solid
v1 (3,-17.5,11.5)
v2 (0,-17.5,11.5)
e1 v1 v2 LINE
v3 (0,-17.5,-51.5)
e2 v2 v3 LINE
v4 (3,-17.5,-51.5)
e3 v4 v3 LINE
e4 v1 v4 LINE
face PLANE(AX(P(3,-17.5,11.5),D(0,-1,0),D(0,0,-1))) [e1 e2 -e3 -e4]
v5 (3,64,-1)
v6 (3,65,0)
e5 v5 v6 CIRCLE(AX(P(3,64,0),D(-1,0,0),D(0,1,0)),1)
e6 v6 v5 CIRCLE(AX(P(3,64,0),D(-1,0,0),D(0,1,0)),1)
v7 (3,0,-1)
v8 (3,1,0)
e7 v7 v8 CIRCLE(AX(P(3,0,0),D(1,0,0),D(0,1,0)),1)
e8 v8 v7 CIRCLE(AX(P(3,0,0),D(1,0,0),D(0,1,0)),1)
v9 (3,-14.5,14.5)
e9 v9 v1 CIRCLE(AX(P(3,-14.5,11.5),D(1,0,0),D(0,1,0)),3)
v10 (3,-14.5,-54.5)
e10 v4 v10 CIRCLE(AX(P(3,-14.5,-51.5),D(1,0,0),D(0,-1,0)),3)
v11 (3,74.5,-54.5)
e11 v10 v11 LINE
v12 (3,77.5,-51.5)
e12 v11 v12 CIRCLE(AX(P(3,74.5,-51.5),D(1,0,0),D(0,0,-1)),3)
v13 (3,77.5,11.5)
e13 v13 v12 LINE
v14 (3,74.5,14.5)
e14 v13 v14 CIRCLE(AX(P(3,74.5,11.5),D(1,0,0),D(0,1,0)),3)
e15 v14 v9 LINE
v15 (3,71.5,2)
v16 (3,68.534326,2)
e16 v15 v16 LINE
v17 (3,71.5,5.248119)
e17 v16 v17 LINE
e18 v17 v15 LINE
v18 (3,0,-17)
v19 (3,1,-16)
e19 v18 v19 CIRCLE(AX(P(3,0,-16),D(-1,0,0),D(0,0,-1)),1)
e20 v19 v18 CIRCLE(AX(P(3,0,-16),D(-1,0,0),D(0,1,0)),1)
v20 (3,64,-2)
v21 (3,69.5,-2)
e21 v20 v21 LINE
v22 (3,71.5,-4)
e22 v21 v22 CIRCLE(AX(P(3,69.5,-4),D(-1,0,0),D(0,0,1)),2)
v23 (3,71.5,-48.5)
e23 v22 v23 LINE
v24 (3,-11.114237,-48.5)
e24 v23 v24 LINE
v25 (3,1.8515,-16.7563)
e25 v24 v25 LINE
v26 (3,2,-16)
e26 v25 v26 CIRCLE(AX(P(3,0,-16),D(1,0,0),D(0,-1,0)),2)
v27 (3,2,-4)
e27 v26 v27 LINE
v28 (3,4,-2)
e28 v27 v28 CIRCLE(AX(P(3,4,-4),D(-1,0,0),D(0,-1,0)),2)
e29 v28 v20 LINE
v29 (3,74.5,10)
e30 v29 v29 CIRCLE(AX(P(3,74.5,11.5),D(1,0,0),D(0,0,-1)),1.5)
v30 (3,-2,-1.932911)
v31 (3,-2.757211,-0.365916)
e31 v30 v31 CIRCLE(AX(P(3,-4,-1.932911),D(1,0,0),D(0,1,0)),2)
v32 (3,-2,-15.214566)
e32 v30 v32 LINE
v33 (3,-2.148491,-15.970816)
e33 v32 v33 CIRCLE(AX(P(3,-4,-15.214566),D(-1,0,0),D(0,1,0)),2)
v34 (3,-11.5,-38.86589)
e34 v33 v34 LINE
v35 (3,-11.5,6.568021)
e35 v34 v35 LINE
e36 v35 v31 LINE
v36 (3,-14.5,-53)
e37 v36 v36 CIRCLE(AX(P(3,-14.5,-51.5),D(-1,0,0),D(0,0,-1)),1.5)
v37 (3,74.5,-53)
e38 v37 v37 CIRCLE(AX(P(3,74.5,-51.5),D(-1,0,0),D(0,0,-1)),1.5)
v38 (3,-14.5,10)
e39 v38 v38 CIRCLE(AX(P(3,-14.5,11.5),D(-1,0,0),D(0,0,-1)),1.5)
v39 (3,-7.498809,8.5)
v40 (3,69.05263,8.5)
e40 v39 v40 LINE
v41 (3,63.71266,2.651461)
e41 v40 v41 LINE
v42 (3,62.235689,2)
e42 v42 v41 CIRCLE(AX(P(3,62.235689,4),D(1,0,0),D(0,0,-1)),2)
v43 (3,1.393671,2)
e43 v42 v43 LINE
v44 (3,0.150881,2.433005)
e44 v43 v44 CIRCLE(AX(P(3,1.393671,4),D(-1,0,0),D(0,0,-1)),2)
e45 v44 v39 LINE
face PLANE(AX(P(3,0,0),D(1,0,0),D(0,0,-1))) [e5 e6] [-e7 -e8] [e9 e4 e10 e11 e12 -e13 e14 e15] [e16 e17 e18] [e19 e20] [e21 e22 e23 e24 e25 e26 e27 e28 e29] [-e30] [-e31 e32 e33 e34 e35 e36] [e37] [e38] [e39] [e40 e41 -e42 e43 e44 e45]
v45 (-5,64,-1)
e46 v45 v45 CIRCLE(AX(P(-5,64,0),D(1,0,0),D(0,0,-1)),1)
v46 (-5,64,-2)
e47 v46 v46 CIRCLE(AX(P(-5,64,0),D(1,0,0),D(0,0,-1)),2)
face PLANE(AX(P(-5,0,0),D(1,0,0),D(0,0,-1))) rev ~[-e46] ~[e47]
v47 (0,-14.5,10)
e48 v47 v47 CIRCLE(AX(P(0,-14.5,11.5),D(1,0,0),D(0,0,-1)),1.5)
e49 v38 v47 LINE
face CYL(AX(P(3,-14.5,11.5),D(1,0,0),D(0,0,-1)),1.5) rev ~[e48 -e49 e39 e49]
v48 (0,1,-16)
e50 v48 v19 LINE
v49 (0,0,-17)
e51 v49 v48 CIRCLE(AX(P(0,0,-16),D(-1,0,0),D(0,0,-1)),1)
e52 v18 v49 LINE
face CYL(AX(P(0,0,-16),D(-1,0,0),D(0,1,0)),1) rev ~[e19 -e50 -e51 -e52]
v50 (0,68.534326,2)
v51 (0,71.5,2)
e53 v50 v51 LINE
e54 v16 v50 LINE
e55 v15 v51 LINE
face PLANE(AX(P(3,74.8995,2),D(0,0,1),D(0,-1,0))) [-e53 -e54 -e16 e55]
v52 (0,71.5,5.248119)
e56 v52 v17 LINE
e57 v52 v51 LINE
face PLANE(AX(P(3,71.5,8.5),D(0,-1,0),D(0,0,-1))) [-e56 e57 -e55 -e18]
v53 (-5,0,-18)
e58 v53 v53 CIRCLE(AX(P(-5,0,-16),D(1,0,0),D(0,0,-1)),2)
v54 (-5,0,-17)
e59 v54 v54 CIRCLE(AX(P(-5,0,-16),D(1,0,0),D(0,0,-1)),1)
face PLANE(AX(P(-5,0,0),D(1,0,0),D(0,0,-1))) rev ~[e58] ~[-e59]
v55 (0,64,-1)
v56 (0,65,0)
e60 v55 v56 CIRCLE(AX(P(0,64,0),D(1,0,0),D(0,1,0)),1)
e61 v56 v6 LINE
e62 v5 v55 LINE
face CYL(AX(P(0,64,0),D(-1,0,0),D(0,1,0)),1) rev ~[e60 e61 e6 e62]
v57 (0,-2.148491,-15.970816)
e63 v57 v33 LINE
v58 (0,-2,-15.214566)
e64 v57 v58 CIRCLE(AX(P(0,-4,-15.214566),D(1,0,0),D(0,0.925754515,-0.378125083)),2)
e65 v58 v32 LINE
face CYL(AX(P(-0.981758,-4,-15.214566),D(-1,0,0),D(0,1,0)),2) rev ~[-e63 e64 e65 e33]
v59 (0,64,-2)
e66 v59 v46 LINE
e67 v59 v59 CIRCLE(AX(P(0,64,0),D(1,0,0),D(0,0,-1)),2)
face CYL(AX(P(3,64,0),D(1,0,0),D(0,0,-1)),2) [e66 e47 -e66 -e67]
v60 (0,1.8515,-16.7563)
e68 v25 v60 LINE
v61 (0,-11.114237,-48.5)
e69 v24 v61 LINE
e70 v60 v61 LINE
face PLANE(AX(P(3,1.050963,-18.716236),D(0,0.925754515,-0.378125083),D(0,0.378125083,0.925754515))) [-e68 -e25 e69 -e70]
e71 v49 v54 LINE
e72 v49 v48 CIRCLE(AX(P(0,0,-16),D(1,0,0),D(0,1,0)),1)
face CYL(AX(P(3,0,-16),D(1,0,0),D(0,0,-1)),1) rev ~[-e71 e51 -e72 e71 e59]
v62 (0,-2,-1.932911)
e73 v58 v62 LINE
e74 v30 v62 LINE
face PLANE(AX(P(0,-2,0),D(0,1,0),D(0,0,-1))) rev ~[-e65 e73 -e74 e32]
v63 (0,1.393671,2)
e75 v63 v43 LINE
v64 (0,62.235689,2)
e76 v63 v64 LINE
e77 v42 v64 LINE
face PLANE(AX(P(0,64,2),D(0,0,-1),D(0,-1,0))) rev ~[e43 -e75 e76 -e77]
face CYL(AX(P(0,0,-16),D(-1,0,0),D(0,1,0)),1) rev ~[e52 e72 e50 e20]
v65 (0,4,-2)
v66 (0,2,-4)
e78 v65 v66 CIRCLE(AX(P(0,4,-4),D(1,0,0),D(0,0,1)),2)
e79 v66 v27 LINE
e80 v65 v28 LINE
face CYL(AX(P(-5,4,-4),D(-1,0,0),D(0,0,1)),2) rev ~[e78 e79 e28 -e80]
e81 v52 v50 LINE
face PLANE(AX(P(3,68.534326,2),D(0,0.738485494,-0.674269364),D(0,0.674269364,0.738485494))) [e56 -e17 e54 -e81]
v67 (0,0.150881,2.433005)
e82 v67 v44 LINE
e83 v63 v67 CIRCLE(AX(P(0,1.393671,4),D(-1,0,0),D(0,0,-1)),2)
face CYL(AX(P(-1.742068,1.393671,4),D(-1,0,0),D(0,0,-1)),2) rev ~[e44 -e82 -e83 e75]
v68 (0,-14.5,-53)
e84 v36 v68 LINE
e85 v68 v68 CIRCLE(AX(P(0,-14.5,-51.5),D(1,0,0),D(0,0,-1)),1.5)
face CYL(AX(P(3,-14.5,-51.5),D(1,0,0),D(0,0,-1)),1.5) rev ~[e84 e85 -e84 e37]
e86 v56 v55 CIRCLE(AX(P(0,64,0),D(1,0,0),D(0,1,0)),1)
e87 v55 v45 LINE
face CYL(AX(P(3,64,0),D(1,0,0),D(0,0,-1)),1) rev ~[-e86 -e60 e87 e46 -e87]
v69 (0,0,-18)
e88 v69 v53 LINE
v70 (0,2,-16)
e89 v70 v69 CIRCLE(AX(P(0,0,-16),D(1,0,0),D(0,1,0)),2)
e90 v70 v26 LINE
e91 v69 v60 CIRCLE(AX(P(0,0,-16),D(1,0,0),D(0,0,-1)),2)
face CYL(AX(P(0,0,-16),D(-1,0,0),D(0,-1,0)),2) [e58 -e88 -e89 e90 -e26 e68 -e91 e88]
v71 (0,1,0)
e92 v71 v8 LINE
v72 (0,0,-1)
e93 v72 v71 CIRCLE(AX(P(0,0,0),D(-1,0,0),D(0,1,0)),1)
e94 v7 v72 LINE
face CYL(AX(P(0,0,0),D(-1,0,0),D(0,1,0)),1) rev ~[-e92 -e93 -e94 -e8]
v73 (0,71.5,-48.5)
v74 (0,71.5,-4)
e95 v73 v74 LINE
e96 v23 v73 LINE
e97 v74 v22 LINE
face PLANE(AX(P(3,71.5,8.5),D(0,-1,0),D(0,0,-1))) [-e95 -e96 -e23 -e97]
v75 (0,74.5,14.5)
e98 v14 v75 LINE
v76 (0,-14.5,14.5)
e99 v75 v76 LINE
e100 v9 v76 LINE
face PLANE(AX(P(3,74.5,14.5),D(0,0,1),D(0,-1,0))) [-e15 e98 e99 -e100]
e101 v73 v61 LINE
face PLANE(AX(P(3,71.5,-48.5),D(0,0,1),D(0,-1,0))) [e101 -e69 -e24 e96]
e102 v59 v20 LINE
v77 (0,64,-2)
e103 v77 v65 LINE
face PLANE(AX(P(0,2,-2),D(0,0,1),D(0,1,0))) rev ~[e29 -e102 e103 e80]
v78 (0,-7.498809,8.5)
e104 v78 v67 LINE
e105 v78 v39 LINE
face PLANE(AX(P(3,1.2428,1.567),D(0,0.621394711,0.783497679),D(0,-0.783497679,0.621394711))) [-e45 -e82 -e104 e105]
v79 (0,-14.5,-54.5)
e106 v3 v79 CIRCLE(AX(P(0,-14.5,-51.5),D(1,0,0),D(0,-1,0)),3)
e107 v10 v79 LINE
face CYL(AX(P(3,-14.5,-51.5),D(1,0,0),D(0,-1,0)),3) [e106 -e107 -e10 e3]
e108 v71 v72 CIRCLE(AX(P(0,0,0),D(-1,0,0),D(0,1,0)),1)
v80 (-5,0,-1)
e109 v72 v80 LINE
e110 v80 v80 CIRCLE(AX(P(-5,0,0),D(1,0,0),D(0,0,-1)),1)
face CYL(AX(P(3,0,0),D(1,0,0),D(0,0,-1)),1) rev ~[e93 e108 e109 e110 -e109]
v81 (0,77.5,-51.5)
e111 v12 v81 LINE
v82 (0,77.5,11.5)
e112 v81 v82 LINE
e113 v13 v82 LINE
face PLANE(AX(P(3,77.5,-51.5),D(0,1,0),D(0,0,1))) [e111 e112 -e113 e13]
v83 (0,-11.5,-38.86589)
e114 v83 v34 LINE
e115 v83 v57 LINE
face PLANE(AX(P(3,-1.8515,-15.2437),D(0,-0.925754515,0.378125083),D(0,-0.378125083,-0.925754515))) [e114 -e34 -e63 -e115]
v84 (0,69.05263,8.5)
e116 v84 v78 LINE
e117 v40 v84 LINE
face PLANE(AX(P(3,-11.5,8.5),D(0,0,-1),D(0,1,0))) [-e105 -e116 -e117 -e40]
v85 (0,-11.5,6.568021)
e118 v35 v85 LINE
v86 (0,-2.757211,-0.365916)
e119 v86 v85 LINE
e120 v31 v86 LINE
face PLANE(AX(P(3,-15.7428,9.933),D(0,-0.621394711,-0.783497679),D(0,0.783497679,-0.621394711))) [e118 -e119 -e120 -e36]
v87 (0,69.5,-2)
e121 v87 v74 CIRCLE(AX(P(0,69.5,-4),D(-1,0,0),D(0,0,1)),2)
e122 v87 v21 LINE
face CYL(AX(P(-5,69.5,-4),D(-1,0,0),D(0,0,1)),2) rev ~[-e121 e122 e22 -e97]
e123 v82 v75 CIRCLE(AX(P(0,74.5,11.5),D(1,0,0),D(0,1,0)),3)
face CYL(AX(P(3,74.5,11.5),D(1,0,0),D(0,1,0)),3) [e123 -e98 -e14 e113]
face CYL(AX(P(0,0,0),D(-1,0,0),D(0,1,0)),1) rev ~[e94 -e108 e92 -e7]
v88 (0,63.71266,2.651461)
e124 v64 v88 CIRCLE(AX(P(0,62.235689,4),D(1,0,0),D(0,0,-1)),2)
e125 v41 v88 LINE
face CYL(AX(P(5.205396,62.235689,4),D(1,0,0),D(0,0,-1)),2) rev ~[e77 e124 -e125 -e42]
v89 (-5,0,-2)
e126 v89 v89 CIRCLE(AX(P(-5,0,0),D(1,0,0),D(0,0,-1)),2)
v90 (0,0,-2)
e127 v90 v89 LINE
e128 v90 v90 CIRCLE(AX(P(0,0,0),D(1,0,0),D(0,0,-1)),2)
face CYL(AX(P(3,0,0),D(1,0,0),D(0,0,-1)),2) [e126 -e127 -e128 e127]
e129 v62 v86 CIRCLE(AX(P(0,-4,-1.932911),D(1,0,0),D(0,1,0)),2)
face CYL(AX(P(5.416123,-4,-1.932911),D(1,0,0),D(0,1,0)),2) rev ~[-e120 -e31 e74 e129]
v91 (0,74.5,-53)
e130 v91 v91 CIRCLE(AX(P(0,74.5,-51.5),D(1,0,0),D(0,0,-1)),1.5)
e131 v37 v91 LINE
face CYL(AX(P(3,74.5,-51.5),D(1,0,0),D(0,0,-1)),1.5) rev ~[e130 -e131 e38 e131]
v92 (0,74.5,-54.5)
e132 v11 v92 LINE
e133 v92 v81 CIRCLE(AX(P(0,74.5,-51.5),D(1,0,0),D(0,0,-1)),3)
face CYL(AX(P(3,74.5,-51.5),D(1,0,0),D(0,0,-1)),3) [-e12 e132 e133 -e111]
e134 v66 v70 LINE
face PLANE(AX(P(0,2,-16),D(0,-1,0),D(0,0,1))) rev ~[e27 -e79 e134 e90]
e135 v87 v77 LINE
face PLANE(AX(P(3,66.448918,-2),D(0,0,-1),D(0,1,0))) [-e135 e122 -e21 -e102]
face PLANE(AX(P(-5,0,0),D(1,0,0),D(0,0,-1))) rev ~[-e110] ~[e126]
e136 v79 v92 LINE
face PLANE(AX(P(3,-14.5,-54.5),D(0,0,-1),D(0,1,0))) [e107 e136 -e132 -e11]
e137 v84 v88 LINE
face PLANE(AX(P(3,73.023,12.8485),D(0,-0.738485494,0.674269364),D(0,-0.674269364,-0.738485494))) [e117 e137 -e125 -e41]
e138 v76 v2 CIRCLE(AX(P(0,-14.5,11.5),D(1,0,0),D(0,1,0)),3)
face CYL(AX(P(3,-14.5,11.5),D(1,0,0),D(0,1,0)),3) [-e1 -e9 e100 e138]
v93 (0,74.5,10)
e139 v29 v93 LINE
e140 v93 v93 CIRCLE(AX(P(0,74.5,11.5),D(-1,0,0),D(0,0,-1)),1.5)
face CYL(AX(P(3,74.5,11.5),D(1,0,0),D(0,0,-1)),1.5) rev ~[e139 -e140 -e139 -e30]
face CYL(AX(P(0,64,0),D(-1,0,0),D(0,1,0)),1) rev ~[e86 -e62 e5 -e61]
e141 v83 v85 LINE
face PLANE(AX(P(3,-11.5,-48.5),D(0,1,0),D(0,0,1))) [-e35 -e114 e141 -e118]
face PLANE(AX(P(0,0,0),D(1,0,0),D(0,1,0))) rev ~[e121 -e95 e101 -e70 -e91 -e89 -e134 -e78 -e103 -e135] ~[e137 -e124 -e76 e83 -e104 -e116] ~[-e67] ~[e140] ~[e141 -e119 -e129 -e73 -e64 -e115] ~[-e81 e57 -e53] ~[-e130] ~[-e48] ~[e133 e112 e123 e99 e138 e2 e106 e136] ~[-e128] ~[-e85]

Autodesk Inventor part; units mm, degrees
ref_plane "YZ Plane" through (0, 0, 0) normal (1, 0, 0) x (0, 1, 0)
ref_plane "XZ Plane" through (0, 0, 0) normal (0, 1, 0) x (-1, 0, 0)
ref_plane "XY Plane" through (0, 0, 0) normal (0, 0, 1) x (1, 0, 0)
sketch "Sketch1" plane through (0, 0, 0) normal (1, 0, 0) x (0, 1, 0)
  line L0 (0, 0) -> (0, -16)
  circle A0 centre (0, 0) radius 1
  circle A1 centre (0, -16) radius 1
  line L1 (0, 0) -> (64, 0)
  circle A2 centre (64, 0) radius 1
  line L2 (64, 0) -> (0, 0) construction
  line L3 (64, 2) -> (0, 2)
  line L4 (0, -2) -> (64, -2)
  arc A3 (64, -2) -> (64, 2) centre (64, 0) ccw
  arc A4 (0, 2) -> (0, -2) centre (0, 0) ccw
  line L5 (0, 0) -> (0, -16) construction
  line L6 (-2, 0) -> (-2, -16)
  line L7 (2, -16) -> (2, 0)
  arc A5 (2, 0) -> (-2, 0) centre (0, 0) ccw
  arc A6 (-2, -16) -> (2, -16) centre (0, -16) ccw
  point P0 (32, 0)
  point P1 (0, -8)
  point P2 (2, -2)
  dimension "d0" = 16
  dimension "d1" = 2
  dimension "d2" = 2
  dimension "d3" = 64
  dimension "d4" = 2
  dimension "d5" = 4
  dimension "d6" = 4
extrude "Extrusion1" add sketch "Sketch1" along normal blind 3 contours A0 L1 L7 L4 L0 | L0 A4 A5 L1 A0 | L4 L7 A6 L6 A4 | A5 L3 A3 L4 L7
sketch "Sketch2" plane through (3, 0, 0) normal (1, 0, 0) x (0, 0, -1)
  circle A0 centre (0, 64) radius 1 projected
  circle A1 centre (0, 64) radius 1
  circle A2 centre (0, 64) radius 2
  circle A3 centre (0, 0) radius 1
  circle A4 centre (0, 0) radius 2
  circle A5 centre (16, 0) radius 1 projected
  circle A6 centre (16, 0) radius 1
  circle A7 centre (16, 0) radius 2
  dimension "d9" = 2
  dimension "d10" = 4
  dimension "d11" = 2
  dimension "d12" = 4
extrude "Extrusion2" add sketch "Sketch2" against normal blind 8
sketch "Sketch3" plane through (3, 0, 0) normal (1, 0, 0) x (0, 0, -1)
  arc A0 (0, -2) -> (-2, 0) centre (0, 0) ccw projected
  line L0 (0, 0) -> (0, 30)
  line L1 (0, 30) -> (20, 30)
  line L2 (-11.5, 74.5) -> (51.5, 74.5)
  line L3 (51.5, 74.5) -> (51.5, -14.5)
  line L4 (51.5, -14.5) -> (-11.5, -14.5)
  line L5 (-11.5, -14.5) -> (-11.5, 74.5)
  line L6 (-11.5, 74.5) -> (51.5, -14.5) construction
  line L7 (51.5, 74.5) -> (-11.5, -14.5) construction
  circle A1 centre (-11.5, 74.5) radius 1.5
  circle A2 centre (51.5, 74.5) radius 1.5
  circle A3 centre (51.5, -14.5) radius 1.5
  circle A4 centre (-11.5, -14.5) radius 1.5
  line L8 (-11.5, -14.5) -> (51.5, -14.5) construction
  line L9 (-11.5, -17.5) -> (51.5, -17.5)
  line L10 (51.5, -11.5) -> (-11.5, -11.5)
  arc A5 (-11.5, -11.5) -> (-11.5, -17.5) centre (-11.5, -14.5) ccw
  arc A6 (51.5, -17.5) -> (51.5, -11.5) centre (51.5, -14.5) ccw
  line L11 (51.5, -14.5) -> (51.5, 74.5) construction
  line L12 (54.5, -14.5) -> (54.5, 74.5)
  line L13 (48.5, 74.5) -> (48.5, -14.5)
  arc A7 (48.5, -14.5) -> (54.5, -14.5) centre (51.5, -14.5) ccw
  arc A8 (54.5, 74.5) -> (48.5, 74.5) centre (51.5, 74.5) ccw
  line L14 (51.5, 74.5) -> (-11.5, 74.5) construction
  line L15 (51.5, 77.5) -> (-11.5, 77.5)
  line L16 (-11.5, 71.5) -> (51.5, 71.5)
  arc A9 (51.5, 71.5) -> (51.5, 77.5) centre (51.5, 74.5) ccw
  arc A10 (-11.5, 77.5) -> (-11.5, 71.5) centre (-11.5, 74.5) ccw
  line L17 (-11.5, 74.5) -> (-11.5, -14.5) construction
  line L18 (-14.5, 74.5) -> (-14.5, -14.5)
  line L19 (-8.5, -14.5) -> (-8.5, 74.5)
  arc A11 (-8.5, 74.5) -> (-14.5, 74.5) centre (-11.5, 74.5) ccw
  arc A12 (-14.5, -14.5) -> (-8.5, -14.5) centre (-11.5, -14.5) ccw
  point P0 (20, -14.5)
  point P1 (51.5, 30)
  point P2 (20, 74.5)
  point P3 (-11.5, 30)
  point P4 (-8.5, -11.5)
  point P5 (-8.5, 71.5)
  point P6 (48.5, 71.5)
  point P7 (48.5, -11.5)
  point P8 (54.5, -14.5)
  point P9 (51.5, 77.5)
  point P10 (-14.5, 74.5)
  point P11 (-14.5, -14.5)
  dimension "d15" = 30
  dimension "d16" = 20
  dimension "d17" = 63
  dimension "d18" = 89
  dimension "d19" = 3
  dimension "d20" = 3
  dimension "d21" = 3
  dimension "d22" = 3
  dimension "d23" = 6
  dimension "d24" = 6
  dimension "d25" = 6
  dimension "d26" = 6
extrude "Extrusion3" add sketch "Sketch3" against normal blind 3 contours A1 L5 A10 A11 L2 | L2 L19 L16 L5 A1 | A11 L15 A8 L2 | L2 L13 L16 L19 | L16 L19 L10 L5 | L5 A5 L18 A10 | A8 A9 L3 A2 L2 | L2 A2 L3 L16 L13 | L10 L19 L4 A4 L5 | L5 A4 L4 A12 A5 | L16 L3 L10 L13 | L10 L13 L4 L19 | L10 L3 A3 L4 L13 | A9 L12 A6 L3 | L4 A7 L9 A12 | A6 A7 L4 A3 L3
sketch "Sketch4" plane through (3, 0, 0) normal (1, 0, 0) x (0, 0, -1)
  circle A0 centre (-11.5, 74.5) radius 1.5 projected
  circle A1 centre (0, 64) radius 1 projected
  line L0 (-11.5, 74.5) -> (0, 64) construction
  line L1 (-12.8485, 73.023) -> (-1.3485, 62.523)
  line L2 (1.3485, 65.477) -> (-10.1515, 75.977)
  arc A2 (-10.1515, 75.977) -> (-12.8485, 73.023) centre (-11.5, 74.5) ccw
  arc A3 (-1.3485, 62.523) -> (1.3485, 65.477) centre (0, 64) ccw
  circle A4 centre (0, 0) radius 1 projected
  circle A5 centre (-11.5, -14.5) radius 1.5 projected
  line L3 (0, 0) -> (-11.5, -14.5) construction
  line L4 (-1.567, 1.2428) -> (-13.067, -13.2572)
  line L5 (-9.933, -15.7428) -> (1.567, -1.2428)
  arc A6 (1.567, -1.2428) -> (-1.567, 1.2428) centre (0, 0) ccw
  arc A7 (-13.067, -13.2572) -> (-9.933, -15.7428) centre (-11.5, -14.5) ccw
  circle A8 centre (16, 0) radius 1 projected
  circle A9 centre (51.5, -14.5) radius 1.5 projected
  line L6 (16, 0) -> (51.5, -14.5) construction
  line L7 (15.2437, -1.8515) -> (50.7437, -16.3515)
  line L8 (52.2563, -12.6485) -> (16.7563, 1.8515)
  arc A10 (16.7563, 1.8515) -> (15.2437, -1.8515) centre (16, 0) ccw
  arc A11 (50.7437, -16.3515) -> (52.2563, -12.6485) centre (51.5, -14.5) ccw
  circle A12 centre (51.5, 74.5) radius 1.5 projected
  line L9 (0, 64) -> (51.5, 74.5) construction
  line L10 (0.3995, 62.0403) -> (51.8995, 72.5403)
  line L11 (51.1005, 76.4597) -> (-0.3995, 65.9597)
  arc A13 (-0.3995, 65.9597) -> (0.3995, 62.0403) centre (0, 64) ccw
  arc A14 (51.8995, 72.5403) -> (51.1005, 76.4597) centre (51.5, 74.5) ccw
  line L12 (16, 0) -> (51.5, 74.5) construction
  line L13 (17.8055, -0.8603) -> (53.3055, 73.6397)
  line L14 (49.6945, 75.3603) -> (14.1945, 0.8603)
  arc A15 (14.1945, 0.8603) -> (17.8055, -0.8603) centre (16, 0) ccw
  arc A16 (53.3055, 73.6397) -> (49.6945, 75.3603) centre (51.5, 74.5) ccw
  line L15 (0, 64) -> (0, 74.8995) construction
  line L16 (2, 64) -> (2, 74.8995)
  line L17 (-2, 74.8995) -> (-2, 64)
  arc A17 (-2, 64) -> (2, 64) centre (0, 64) ccw
  arc A18 (2, 74.8995) -> (-2, 74.8995) centre (0, 74.8995) ccw
  point P0 (-5.75, 69.25)
  point P1 (-5.75, -7.25)
  point P2 (33.75, -7.25)
  point P3 (25.75, 69.25)
  point P4 (33.75, 37.25)
  point P5 (-1.3485, 62.523)
  point P6 (0.5973, 66.1629)
  point P7 (47.9689, 71.7389)
  point P8 (18.7162, 1.0509)
  point P9 (-1.3485, 62.523)
  point P10 (0, 69.4498)
  point P11 (-2, 68.5343)
  dimension "d29" = 4
  dimension "d30" = 4
  dimension "d31" = 4
  dimension "d45" = 4
extrude "Extrusion4" add sketch "Sketch4" against normal blind 3 contours A2 L2 L17 A13 L1 | A13 L11 L2 A3 | L17 L2 L11 A13 | L17 A18 L16 L11 L2 | A3 L2 L11 L16 | L14 A16 A14 L10 | A10 L8 L13 A15 | A15 L13 L8 A11 L7 | A6 L5 A7 L4
fillet "Fillet2" radius 2 6 edges at (1.5, 71.5, -2) (1.5, 63.1178, 2) (1.5, 2, -2) (1.5, -2, -15.6073) (1.5, -2, -0.9664) (1.5, 0.6968, 2)
properties part number "individual_servodriver_support"
